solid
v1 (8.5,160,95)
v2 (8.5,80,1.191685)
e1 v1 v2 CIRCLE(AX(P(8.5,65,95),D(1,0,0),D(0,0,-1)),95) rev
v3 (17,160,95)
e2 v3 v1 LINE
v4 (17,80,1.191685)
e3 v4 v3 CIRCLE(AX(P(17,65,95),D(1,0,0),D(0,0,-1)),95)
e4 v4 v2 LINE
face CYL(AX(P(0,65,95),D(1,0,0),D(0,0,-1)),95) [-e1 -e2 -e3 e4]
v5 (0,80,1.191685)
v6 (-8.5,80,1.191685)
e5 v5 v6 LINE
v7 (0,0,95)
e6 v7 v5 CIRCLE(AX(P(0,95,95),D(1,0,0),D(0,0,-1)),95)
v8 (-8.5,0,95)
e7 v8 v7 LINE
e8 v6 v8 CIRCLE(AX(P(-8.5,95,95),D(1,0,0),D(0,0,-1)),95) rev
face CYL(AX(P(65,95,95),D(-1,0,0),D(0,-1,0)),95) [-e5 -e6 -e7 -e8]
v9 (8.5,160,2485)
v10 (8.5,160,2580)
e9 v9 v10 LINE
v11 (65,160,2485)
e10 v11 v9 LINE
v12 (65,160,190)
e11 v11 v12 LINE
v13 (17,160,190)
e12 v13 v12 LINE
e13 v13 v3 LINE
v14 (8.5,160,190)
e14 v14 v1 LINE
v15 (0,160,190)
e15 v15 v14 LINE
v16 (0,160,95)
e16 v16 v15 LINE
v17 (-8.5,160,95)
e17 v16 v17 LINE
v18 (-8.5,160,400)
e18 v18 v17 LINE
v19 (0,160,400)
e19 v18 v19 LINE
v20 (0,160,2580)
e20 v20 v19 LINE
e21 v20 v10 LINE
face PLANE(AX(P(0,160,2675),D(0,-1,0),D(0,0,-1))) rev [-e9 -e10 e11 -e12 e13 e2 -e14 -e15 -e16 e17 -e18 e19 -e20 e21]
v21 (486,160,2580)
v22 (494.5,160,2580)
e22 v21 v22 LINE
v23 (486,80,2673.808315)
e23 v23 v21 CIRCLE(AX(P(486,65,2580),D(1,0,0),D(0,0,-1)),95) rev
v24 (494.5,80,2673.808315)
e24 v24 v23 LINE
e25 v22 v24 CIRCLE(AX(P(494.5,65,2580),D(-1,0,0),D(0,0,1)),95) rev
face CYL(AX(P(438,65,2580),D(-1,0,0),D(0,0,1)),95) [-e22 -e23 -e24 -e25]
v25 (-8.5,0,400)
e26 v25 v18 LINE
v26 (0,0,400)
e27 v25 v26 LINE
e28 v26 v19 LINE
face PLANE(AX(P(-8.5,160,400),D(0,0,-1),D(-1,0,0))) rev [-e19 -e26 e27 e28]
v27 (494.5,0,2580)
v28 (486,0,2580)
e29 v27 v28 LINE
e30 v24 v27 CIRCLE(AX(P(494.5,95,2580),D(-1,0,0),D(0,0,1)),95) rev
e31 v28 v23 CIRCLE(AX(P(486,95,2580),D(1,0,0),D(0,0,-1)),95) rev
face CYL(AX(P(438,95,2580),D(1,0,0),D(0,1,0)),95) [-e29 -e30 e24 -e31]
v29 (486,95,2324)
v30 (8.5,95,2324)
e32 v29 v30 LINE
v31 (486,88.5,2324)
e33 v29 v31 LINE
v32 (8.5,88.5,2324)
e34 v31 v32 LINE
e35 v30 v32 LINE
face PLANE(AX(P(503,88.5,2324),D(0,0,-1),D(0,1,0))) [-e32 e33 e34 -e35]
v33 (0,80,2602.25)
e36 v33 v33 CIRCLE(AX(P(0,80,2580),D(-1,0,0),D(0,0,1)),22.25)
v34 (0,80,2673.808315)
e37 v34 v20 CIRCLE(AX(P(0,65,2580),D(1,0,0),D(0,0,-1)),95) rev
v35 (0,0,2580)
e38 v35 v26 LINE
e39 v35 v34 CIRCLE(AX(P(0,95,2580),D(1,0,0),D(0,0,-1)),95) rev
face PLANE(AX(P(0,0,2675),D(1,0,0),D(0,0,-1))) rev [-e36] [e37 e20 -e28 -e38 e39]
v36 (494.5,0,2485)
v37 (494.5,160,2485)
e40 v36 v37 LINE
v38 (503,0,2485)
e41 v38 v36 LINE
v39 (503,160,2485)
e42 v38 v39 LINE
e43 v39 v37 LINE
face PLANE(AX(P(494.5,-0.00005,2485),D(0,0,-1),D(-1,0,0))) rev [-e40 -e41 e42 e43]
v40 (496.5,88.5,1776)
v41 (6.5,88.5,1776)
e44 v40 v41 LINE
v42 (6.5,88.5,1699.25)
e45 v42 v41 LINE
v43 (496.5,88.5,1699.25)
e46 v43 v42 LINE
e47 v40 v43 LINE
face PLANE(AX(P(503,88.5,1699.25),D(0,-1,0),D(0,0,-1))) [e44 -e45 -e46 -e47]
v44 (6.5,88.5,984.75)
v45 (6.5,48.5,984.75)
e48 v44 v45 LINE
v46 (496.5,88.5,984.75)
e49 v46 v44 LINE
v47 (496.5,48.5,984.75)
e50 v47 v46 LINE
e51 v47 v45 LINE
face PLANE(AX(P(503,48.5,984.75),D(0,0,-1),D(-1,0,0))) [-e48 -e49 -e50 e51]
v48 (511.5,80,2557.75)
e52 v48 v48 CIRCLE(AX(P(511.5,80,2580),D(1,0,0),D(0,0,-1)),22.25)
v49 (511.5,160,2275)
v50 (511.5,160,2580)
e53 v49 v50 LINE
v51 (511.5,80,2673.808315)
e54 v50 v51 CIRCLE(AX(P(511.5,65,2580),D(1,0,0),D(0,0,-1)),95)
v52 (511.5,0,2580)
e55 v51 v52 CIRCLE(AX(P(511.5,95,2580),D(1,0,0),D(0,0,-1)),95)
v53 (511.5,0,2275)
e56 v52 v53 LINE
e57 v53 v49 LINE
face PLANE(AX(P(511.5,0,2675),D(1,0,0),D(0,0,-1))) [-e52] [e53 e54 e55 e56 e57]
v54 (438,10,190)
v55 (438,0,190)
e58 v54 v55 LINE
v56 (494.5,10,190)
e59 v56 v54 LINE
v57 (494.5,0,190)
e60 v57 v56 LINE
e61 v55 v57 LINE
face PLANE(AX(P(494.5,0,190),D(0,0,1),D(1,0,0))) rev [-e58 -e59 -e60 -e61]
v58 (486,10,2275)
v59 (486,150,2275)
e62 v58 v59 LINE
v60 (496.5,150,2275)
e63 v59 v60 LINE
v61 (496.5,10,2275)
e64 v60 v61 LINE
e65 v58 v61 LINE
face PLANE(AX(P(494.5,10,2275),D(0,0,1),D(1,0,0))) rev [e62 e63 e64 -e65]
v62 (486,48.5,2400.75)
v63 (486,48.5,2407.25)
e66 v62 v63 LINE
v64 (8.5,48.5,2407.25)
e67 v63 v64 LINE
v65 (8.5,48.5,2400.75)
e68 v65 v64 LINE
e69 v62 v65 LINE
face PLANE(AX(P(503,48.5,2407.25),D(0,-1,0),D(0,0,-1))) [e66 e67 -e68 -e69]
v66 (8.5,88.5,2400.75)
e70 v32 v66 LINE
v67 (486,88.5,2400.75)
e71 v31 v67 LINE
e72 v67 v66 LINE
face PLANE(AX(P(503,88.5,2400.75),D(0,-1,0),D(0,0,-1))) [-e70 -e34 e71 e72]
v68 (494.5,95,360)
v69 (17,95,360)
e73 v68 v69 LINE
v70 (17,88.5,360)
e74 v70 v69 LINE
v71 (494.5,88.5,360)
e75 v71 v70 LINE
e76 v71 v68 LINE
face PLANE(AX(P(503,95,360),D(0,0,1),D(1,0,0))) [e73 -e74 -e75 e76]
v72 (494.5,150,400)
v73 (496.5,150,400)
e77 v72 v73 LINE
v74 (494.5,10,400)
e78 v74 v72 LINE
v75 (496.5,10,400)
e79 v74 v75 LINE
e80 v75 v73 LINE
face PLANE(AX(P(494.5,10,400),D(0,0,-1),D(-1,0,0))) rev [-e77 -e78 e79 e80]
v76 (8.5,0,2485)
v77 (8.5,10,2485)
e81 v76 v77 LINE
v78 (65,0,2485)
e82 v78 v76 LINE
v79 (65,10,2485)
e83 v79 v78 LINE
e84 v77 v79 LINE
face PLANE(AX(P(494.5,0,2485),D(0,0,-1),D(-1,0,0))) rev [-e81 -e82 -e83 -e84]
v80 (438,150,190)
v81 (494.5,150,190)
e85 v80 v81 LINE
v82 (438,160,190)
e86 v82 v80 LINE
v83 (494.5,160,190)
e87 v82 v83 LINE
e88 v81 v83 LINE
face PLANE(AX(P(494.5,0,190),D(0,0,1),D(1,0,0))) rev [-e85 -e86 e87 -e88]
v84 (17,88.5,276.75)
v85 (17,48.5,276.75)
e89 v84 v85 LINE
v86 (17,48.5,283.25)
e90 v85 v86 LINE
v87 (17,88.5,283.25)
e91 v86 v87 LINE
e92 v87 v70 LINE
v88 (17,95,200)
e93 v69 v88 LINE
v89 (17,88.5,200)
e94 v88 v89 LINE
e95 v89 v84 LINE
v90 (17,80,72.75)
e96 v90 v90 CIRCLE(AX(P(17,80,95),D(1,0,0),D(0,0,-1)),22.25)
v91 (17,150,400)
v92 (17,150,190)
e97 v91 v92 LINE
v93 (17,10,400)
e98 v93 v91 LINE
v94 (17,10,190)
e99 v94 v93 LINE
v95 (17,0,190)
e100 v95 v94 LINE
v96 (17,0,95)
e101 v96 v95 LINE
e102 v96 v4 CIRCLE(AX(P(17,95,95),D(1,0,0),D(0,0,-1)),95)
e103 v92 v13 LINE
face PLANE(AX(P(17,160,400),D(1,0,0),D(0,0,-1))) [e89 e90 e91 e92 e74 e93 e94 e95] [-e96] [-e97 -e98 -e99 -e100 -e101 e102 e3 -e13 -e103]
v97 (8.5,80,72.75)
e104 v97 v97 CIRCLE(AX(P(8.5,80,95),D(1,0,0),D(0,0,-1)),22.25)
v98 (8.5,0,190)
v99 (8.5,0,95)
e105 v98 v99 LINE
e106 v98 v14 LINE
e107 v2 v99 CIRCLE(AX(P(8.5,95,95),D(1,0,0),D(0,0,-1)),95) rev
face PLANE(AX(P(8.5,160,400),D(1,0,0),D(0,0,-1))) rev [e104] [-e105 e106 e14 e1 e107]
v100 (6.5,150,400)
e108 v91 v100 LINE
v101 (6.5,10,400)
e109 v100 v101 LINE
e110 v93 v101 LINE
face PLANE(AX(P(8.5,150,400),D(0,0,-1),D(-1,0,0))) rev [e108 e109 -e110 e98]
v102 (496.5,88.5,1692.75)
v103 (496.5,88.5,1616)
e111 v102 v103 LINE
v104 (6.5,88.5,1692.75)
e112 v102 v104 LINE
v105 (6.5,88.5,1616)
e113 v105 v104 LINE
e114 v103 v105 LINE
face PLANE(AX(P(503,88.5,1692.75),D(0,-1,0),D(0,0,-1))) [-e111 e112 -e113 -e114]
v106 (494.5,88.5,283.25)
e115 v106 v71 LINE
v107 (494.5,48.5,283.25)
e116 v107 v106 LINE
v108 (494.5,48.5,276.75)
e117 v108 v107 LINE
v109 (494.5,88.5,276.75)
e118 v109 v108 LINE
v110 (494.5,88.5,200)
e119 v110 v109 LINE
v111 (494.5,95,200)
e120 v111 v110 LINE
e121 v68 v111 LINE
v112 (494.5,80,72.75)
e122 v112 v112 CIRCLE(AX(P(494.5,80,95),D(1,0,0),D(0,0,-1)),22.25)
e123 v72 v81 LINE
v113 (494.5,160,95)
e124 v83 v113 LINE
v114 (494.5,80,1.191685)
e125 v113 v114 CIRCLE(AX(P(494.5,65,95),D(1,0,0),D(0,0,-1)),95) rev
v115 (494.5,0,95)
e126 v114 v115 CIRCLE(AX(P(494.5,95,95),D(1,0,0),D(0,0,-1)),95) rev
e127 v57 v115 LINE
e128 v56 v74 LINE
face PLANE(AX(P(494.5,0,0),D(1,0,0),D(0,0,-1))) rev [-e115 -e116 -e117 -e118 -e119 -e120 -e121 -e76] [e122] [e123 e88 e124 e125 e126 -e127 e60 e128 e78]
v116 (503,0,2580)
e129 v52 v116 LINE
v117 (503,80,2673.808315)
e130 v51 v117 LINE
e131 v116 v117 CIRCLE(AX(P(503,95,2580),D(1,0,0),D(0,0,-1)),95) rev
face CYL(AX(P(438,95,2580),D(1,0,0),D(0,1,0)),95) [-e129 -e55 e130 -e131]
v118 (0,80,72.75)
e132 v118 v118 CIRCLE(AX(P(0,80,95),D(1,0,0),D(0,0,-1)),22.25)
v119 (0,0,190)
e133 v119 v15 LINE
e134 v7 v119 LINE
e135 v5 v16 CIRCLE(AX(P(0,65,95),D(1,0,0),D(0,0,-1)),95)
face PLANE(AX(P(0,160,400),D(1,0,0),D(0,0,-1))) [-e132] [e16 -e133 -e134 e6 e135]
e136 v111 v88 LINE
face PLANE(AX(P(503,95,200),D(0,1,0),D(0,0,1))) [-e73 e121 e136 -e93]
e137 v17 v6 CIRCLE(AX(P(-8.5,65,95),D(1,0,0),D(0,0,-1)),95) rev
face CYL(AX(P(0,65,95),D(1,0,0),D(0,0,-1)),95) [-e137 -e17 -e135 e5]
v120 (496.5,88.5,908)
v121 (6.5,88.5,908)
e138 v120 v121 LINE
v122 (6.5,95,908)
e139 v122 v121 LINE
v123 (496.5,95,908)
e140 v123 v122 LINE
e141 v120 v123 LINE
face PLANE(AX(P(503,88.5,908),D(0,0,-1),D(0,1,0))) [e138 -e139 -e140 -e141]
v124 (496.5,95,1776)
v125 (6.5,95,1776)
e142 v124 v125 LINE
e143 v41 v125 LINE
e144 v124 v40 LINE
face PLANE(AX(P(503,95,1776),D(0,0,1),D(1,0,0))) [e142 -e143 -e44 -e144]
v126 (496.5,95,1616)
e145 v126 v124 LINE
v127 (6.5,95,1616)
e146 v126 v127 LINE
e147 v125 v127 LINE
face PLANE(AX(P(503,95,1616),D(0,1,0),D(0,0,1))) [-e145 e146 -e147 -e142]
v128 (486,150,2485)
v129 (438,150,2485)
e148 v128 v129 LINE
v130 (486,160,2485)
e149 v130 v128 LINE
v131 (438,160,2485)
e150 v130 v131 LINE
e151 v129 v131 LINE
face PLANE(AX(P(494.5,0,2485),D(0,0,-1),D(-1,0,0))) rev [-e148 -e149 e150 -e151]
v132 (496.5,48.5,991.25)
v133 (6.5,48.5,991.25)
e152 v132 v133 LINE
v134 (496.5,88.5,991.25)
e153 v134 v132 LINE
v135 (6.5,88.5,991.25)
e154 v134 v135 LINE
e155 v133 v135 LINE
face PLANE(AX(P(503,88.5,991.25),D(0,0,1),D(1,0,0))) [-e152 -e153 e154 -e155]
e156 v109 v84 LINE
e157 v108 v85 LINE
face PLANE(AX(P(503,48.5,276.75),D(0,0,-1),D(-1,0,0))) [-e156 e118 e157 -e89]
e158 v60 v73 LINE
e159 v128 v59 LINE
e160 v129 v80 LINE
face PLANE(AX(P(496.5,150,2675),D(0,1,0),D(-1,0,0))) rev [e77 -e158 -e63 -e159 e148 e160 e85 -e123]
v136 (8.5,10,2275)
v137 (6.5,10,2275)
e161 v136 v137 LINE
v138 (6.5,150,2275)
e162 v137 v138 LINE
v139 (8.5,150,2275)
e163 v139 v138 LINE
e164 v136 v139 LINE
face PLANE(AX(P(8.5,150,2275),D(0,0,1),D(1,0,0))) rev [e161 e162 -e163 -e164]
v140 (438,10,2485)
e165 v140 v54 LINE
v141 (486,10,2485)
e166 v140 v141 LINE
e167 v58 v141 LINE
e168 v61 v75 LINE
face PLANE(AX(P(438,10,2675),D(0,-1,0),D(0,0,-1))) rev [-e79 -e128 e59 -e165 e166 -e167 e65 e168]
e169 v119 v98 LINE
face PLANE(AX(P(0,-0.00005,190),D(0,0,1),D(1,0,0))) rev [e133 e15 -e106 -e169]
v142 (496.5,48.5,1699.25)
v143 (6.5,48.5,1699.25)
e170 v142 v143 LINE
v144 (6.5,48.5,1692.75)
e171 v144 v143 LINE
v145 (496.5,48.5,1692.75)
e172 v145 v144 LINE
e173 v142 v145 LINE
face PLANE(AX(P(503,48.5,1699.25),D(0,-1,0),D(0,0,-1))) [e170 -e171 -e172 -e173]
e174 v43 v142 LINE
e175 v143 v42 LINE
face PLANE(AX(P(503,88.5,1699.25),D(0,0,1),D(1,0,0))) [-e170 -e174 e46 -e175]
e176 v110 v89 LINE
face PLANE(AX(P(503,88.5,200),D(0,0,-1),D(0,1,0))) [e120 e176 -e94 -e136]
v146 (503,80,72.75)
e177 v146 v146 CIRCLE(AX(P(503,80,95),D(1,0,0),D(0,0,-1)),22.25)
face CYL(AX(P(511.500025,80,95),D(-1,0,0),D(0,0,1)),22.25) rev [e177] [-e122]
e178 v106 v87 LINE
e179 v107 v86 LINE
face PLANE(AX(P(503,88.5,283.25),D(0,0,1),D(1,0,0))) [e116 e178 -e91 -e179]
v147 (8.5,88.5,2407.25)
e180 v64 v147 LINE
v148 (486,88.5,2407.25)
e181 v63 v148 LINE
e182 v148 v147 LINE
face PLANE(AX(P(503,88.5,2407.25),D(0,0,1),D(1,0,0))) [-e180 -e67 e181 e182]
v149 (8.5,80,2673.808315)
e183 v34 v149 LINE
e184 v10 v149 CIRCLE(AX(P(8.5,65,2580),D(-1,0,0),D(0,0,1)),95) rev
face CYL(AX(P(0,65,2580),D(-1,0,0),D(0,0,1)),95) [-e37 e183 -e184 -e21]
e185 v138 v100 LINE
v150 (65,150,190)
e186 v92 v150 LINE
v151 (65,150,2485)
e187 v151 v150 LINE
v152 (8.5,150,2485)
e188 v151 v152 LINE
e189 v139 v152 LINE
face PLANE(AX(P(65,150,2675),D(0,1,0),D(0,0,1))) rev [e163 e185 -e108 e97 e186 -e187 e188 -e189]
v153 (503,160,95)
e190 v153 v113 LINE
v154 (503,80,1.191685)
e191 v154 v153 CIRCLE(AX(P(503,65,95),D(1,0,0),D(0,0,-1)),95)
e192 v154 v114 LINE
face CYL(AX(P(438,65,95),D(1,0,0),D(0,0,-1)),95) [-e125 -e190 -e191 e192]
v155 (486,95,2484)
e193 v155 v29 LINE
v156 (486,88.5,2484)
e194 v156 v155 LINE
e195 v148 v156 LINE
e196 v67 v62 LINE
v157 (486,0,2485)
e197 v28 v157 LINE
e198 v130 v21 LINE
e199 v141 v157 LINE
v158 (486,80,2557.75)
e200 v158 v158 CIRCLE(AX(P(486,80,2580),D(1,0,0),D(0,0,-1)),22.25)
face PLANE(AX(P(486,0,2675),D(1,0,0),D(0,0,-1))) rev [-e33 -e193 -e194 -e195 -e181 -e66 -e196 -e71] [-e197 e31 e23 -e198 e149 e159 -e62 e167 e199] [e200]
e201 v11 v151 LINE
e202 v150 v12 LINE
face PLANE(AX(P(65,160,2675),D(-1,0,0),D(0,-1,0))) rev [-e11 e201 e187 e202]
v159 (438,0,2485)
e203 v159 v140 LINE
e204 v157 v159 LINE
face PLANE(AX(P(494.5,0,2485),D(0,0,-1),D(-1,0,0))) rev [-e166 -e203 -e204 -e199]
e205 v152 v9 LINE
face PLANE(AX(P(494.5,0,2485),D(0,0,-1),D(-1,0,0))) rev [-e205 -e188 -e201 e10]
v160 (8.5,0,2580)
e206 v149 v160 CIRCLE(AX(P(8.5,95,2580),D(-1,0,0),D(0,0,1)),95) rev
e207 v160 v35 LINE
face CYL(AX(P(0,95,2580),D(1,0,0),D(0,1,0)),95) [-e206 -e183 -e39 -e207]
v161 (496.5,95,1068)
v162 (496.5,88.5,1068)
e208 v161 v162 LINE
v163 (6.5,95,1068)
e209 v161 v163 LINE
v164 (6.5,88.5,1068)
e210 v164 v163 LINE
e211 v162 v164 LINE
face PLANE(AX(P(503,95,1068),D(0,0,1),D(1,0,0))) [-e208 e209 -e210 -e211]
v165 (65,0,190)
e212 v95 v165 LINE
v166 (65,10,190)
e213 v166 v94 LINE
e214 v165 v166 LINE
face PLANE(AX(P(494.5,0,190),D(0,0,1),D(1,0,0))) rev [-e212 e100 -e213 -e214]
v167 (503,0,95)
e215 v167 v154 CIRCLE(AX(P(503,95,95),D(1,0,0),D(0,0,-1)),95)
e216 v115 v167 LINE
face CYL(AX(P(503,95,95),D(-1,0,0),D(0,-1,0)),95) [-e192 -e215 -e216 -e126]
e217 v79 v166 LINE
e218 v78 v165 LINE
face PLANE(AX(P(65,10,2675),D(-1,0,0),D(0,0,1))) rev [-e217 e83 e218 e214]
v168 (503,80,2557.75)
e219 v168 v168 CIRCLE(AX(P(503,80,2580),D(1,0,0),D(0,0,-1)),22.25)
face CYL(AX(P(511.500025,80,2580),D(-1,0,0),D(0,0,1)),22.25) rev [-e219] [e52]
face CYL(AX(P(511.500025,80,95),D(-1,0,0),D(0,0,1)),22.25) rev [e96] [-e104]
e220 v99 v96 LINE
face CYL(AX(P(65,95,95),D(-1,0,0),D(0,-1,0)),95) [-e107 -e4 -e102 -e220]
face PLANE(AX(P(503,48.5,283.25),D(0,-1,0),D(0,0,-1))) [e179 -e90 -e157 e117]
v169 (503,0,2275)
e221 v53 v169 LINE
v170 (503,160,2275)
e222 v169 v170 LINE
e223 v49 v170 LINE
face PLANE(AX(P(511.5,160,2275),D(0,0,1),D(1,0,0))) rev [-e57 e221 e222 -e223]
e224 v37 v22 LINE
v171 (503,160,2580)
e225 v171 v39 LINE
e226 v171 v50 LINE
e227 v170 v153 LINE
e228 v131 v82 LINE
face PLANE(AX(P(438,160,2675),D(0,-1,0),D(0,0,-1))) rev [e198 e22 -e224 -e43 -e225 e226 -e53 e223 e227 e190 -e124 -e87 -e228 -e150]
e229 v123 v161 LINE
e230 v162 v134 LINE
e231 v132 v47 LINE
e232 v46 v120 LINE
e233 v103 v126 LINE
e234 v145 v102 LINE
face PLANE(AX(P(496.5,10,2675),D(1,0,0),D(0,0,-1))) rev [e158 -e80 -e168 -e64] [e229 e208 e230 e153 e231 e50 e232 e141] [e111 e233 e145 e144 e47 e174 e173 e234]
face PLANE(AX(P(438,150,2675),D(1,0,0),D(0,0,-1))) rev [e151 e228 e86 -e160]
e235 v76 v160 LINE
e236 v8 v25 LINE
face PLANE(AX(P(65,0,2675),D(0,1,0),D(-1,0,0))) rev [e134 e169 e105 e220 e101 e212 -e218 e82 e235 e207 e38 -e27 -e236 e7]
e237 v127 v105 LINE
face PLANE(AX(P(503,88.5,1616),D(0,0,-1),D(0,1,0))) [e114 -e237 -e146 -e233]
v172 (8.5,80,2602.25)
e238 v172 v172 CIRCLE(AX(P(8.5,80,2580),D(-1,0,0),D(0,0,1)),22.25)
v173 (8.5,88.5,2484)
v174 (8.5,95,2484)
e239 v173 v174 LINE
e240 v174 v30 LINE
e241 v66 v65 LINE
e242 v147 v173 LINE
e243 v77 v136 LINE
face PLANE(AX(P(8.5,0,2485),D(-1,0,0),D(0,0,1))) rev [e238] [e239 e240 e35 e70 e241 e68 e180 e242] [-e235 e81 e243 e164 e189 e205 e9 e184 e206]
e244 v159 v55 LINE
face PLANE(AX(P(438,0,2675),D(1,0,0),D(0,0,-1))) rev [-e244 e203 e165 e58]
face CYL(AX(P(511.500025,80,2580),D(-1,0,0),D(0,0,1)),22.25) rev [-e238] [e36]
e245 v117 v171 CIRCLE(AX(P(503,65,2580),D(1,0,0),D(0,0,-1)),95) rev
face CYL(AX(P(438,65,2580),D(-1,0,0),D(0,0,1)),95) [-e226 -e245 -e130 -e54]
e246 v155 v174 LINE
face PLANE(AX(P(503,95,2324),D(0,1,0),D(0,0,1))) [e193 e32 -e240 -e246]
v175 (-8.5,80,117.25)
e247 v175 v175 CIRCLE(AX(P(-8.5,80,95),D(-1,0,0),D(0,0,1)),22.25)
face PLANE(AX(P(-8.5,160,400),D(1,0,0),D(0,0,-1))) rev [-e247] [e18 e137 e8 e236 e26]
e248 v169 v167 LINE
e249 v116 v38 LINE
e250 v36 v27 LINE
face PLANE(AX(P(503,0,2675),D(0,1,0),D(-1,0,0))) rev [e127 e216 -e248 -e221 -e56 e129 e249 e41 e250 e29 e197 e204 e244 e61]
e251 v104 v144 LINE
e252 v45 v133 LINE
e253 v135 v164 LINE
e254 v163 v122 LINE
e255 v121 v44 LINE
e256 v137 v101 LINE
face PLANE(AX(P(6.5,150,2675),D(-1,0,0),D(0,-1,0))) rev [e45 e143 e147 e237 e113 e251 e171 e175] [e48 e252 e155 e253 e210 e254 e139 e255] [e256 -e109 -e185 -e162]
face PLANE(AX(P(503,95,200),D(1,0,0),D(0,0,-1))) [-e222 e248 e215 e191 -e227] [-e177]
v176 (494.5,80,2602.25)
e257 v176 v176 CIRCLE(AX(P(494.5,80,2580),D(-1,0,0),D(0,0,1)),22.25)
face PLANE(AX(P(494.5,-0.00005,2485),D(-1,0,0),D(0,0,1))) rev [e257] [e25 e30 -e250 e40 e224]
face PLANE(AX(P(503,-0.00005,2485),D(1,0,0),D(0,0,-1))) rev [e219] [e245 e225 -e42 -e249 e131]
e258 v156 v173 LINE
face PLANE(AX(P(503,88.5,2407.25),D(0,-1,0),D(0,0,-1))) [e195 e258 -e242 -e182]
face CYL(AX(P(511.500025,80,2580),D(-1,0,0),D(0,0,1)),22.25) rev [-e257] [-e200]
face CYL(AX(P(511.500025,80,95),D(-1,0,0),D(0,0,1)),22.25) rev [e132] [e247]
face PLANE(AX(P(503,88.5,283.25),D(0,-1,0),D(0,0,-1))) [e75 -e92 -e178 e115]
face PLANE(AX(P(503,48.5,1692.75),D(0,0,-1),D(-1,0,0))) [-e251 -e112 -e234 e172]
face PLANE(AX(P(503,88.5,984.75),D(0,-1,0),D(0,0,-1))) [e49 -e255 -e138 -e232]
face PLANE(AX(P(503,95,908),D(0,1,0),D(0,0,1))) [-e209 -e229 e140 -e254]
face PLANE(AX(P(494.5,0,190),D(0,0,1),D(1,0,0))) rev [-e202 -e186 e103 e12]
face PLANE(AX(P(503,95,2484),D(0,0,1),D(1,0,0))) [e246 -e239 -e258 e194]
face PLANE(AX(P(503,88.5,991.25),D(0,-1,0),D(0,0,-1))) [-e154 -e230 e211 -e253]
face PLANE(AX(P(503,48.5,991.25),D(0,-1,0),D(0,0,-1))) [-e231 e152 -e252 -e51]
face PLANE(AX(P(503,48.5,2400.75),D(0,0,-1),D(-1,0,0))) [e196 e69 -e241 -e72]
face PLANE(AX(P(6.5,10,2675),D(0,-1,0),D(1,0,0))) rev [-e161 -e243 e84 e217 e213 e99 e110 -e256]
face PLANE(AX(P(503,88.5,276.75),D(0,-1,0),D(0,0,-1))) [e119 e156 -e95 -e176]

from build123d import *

# Parameters (mm, degrees)
EXTRUDE_1_DEPTH        = 2675
EXTRUDE_1_2_DEPTH      = 2675
EXTRUDE_3_DEPTH        = 503
SKETCH_6_W             = 486
SKETCH_6_H             = 190
CUT_EXTRUDE_4_DEPTH    = 2727.57917545
PATTERN_LINEAR_1_COUNT = 4
PATTERN_LINEAR_1_PITCH = 708
SKETCH_7_W             = 400
SKETCH_7_H             = 140
EXTRUDE_5_DEPTH        = 2
SKETCH_15_W            = 400
SKETCH_15_H            = 140
EXTRUDE_8_DEPTH        = 2
SKETCH_19_W            = 400
SKETCH_19_H            = 160
EXTRUDE_11_DEPTH       = 8.5
PATTERN_LINEAR_2_COUNT = 2
PATTERN_LINEAR_2_PITCH = 17
SKETCH_22_W            = 8.5
SKETCH_22_H            = 190
CUT_EXTRUDE_12_DEPTH   = 2729.160048458
SKETCH_23_R            = 11
SKETCH_23_R_2          = 22.25
CUT_EXTRUDE_13_DEPTH   = 2729.160048458
SKETCH_26_W            = 400
SKETCH_26_H            = 160
EXTRUDE_14_DEPTH       = 8.5
PATTERN_LINEAR_3_COUNT = 2
PATTERN_LINEAR_3_PITCH = 17
SKETCH_27_W            = 8.5
SKETCH_27_H            = 190
CUT_EXTRUDE_15_DEPTH   = 2729.160048458
SKETCH_28_R            = 22.25
CUT_EXTRUDE_16_DEPTH   = 2730.766473528
FILLET_2_R             = 95


with BuildPart() as part:
    # 草图2 → 拉伸1 (new body)
    with BuildSketch(Plane.XY):
        Polygon((0, 0), (0, 160), (65, 160), (65, 150), (6.5, 150), (6.5, 10), (65, 10), (65, 0), align=None)
    extrude(amount=EXTRUDE_1_DEPTH)



with BuildPart() as body_2:
    # 草图2 → Extrude 1 2 (new body)
    with BuildSketch(Plane.XY):
        Polygon((438, 160), (503, 160), (503, 0), (438, 0), (438, 10), (496.5, 10), (496.5, 150), (438, 150), align=None)
    extrude(amount=EXTRUDE_1_2_DEPTH)


with BuildPart() as part_1:
    add(part.part)

    add(body_2.part)  # 拉伸3 merges body 2
    # 草图5 → 拉伸3 (add)
    with BuildSketch(Plane.ZY):
        Polygon((200, 95), (360, 95), (360, 88.5), (283.25, 88.5), (283.25, 48.5), (276.75, 48.5), (276.75, 88.5), (200, 88.5), align=None)
    extrude_3 = extrude(amount=-EXTRUDE_3_DEPTH)

    # 草图6 → 拉伸4 (cut, through all)
    with BuildSketch(Plane(origin=(0, 160, 0), x_dir=(1, 0, 0), z_dir=(0, 1, 0))):
        with Locations((251.5, -95)):
            Rectangle(SKETCH_6_W, SKETCH_6_H)
        with Locations((251.5, -2580)):
            Rectangle(SKETCH_6_W, SKETCH_6_H)
    extrude(amount=-CUT_EXTRUDE_4_DEPTH, mode=Mode.SUBTRACT)

    # 阵列(线性)1: 拉伸3 ×4
    with Locations(*[(0, 0, i * PATTERN_LINEAR_1_PITCH) for i in range(1, PATTERN_LINEAR_1_COUNT)]):
        add(extrude_3)

    # 草图7 → 拉伸5 (add)
    with BuildSketch(Plane.ZY.offset(-496.5)):
        with Locations((200, 80)):
            Rectangle(SKETCH_7_W, SKETCH_7_H)
        with Locations((2475, 80)):
            Rectangle(SKETCH_7_W, SKETCH_7_H)
    extrude(amount=EXTRUDE_5_DEPTH)

    # 草图15 → 拉伸8 (add)
    with BuildSketch(Plane(origin=(6.5, 0, 0), x_dir=(0, 0, -1), z_dir=(1, 0, 0))):
        with Locations((-2475, 80)):
            Rectangle(SKETCH_15_W, SKETCH_15_H)
        with Locations((-200, 80)):
            Rectangle(SKETCH_15_W, SKETCH_15_H)
    extrude(amount=EXTRUDE_8_DEPTH)

    # 草图19 → 拉伸11 (add)
    with BuildSketch(Plane(origin=(503, 0, 0), x_dir=(0, 0, -1), z_dir=(1, 0, 0))):
        with Locations((-2475, 80)):
            Rectangle(SKETCH_19_W, SKETCH_19_H)
    extrude_11 = extrude(amount=EXTRUDE_11_DEPTH)

    # 阵列(线性)2: 拉伸11 ×2
    with Locations(*[(-i * PATTERN_LINEAR_2_PITCH, 0, 0) for i in range(1, PATTERN_LINEAR_2_COUNT)]):
        add(extrude_11)

    # 草图22 → 拉伸12 (cut, through all)
    with BuildSketch(Plane(origin=(0, 160, 0), x_dir=(1, 0, 0), z_dir=(0, 1, 0))):
        with Locations((498.75, -2580)):
            Rectangle(SKETCH_22_W, SKETCH_22_H)
    extrude(amount=-CUT_EXTRUDE_12_DEPTH, mode=Mode.SUBTRACT)

    # 草图23 → 拉伸13 (cut, through all)
    with BuildSketch(Plane.ZY):
        with Locations((95, 80)):
            Circle(SKETCH_23_R)
        with Locations(Location((2580, 80, 0), (0, 0, 180))):
            Circle(SKETCH_23_R_2)
    extrude(amount=-CUT_EXTRUDE_13_DEPTH, mode=Mode.SUBTRACT)

    # 草图26 → 拉伸14 (add)
    with BuildSketch(Plane.ZY):
        with Locations((200, 80)):
            Rectangle(SKETCH_26_W, SKETCH_26_H)
    extrude_14 = extrude(amount=EXTRUDE_14_DEPTH)

    # 阵列(线性)3: 拉伸14 ×2
    with Locations(*[(i * PATTERN_LINEAR_3_PITCH, 0, 0) for i in range(1, PATTERN_LINEAR_3_COUNT)]):
        add(extrude_14)

    # 草图27 → 拉伸15 (cut, through all)
    with BuildSketch(Plane(origin=(0, 160, 0), x_dir=(1, 0, 0), z_dir=(0, 1, 0))):
        with Locations((4.25, -95)):
            Rectangle(SKETCH_27_W, SKETCH_27_H)
    extrude(amount=-CUT_EXTRUDE_15_DEPTH, mode=Mode.SUBTRACT)

    # 草图28 → 拉伸16 (cut, through all)
    with BuildSketch(Plane.ZY.offset(8.5)):
        with Locations(Location((95, 80, 0), (0, 0, 180))):
            Circle(SKETCH_28_R)
    extrude(amount=-CUT_EXTRUDE_16_DEPTH, mode=Mode.SUBTRACT)

    # 圆角2
    # the kernel refuses this fillet: 95 mm, written as the material it takes off along each edge
    with BuildSketch(Plane(origin=(-237.5, 160, 2675), x_dir=(0, 0, -1), z_dir=(1, 0, 0)), Plane(origin=(749, 0, 2675), x_dir=(0, 0, -1), z_dir=(-1, 0, 0)), Plane(origin=(265.5, 160, 2675), x_dir=(0, 0, -1), z_dir=(1, 0, 0)), Plane(origin=(237.5, 160, 0), x_dir=(0, 0, 1), z_dir=(-1, 0, 0)), Plane(origin=(254.5, 160, 0), x_dir=(0, 0, 1), z_dir=(-1, 0, 0)), Plane(origin=(-246, 0, 0), x_dir=(0, 0, 1), z_dir=(1, 0, 0)), Plane(origin=(-229, 0, 0), x_dir=(0, 0, 1), z_dir=(1, 0, 0))) as fillet_2_piece_1:
        with BuildLine():
            CenterArc((FILLET_2_R, -FILLET_2_R), FILLET_2_R, 90, 90)
            Line((0, -FILLET_2_R), (0, 0))
            Line((0, 0), (FILLET_2_R, 0))
        make_face()
    extrude(amount=483.5, mode=Mode.SUBTRACT)
    with BuildSketch(Plane(origin=(246, 0, 2675), x_dir=(0, 1, 0), z_dir=(-1, 0, 0)), Plane(origin=(732, 0, 2675), x_dir=(0, 1, 0), z_dir=(-1, 0, 0)), Plane(origin=(248.5, 160, 2675), x_dir=(0, -1, 0), z_dir=(1, 0, 0)), Plane(origin=(257, 160, 0), x_dir=(0, 0, 1), z_dir=(1, 0, 0)), Plane(origin=(740.5, 0, 0), x_dir=(0, 0, 1), z_dir=(-1, 0, 0))) as fillet_2_piece_2:
        with BuildLine():
            CenterArc((FILLET_2_R, FILLET_2_R), FILLET_2_R, 180, 90)
            Line((0, FILLET_2_R), (0, 0))
            Line((0, 0), (FILLET_2_R, 0))
        make_face()
    extrude(amount=483.5, mode=Mode.SUBTRACT)


solid = part_1.part
